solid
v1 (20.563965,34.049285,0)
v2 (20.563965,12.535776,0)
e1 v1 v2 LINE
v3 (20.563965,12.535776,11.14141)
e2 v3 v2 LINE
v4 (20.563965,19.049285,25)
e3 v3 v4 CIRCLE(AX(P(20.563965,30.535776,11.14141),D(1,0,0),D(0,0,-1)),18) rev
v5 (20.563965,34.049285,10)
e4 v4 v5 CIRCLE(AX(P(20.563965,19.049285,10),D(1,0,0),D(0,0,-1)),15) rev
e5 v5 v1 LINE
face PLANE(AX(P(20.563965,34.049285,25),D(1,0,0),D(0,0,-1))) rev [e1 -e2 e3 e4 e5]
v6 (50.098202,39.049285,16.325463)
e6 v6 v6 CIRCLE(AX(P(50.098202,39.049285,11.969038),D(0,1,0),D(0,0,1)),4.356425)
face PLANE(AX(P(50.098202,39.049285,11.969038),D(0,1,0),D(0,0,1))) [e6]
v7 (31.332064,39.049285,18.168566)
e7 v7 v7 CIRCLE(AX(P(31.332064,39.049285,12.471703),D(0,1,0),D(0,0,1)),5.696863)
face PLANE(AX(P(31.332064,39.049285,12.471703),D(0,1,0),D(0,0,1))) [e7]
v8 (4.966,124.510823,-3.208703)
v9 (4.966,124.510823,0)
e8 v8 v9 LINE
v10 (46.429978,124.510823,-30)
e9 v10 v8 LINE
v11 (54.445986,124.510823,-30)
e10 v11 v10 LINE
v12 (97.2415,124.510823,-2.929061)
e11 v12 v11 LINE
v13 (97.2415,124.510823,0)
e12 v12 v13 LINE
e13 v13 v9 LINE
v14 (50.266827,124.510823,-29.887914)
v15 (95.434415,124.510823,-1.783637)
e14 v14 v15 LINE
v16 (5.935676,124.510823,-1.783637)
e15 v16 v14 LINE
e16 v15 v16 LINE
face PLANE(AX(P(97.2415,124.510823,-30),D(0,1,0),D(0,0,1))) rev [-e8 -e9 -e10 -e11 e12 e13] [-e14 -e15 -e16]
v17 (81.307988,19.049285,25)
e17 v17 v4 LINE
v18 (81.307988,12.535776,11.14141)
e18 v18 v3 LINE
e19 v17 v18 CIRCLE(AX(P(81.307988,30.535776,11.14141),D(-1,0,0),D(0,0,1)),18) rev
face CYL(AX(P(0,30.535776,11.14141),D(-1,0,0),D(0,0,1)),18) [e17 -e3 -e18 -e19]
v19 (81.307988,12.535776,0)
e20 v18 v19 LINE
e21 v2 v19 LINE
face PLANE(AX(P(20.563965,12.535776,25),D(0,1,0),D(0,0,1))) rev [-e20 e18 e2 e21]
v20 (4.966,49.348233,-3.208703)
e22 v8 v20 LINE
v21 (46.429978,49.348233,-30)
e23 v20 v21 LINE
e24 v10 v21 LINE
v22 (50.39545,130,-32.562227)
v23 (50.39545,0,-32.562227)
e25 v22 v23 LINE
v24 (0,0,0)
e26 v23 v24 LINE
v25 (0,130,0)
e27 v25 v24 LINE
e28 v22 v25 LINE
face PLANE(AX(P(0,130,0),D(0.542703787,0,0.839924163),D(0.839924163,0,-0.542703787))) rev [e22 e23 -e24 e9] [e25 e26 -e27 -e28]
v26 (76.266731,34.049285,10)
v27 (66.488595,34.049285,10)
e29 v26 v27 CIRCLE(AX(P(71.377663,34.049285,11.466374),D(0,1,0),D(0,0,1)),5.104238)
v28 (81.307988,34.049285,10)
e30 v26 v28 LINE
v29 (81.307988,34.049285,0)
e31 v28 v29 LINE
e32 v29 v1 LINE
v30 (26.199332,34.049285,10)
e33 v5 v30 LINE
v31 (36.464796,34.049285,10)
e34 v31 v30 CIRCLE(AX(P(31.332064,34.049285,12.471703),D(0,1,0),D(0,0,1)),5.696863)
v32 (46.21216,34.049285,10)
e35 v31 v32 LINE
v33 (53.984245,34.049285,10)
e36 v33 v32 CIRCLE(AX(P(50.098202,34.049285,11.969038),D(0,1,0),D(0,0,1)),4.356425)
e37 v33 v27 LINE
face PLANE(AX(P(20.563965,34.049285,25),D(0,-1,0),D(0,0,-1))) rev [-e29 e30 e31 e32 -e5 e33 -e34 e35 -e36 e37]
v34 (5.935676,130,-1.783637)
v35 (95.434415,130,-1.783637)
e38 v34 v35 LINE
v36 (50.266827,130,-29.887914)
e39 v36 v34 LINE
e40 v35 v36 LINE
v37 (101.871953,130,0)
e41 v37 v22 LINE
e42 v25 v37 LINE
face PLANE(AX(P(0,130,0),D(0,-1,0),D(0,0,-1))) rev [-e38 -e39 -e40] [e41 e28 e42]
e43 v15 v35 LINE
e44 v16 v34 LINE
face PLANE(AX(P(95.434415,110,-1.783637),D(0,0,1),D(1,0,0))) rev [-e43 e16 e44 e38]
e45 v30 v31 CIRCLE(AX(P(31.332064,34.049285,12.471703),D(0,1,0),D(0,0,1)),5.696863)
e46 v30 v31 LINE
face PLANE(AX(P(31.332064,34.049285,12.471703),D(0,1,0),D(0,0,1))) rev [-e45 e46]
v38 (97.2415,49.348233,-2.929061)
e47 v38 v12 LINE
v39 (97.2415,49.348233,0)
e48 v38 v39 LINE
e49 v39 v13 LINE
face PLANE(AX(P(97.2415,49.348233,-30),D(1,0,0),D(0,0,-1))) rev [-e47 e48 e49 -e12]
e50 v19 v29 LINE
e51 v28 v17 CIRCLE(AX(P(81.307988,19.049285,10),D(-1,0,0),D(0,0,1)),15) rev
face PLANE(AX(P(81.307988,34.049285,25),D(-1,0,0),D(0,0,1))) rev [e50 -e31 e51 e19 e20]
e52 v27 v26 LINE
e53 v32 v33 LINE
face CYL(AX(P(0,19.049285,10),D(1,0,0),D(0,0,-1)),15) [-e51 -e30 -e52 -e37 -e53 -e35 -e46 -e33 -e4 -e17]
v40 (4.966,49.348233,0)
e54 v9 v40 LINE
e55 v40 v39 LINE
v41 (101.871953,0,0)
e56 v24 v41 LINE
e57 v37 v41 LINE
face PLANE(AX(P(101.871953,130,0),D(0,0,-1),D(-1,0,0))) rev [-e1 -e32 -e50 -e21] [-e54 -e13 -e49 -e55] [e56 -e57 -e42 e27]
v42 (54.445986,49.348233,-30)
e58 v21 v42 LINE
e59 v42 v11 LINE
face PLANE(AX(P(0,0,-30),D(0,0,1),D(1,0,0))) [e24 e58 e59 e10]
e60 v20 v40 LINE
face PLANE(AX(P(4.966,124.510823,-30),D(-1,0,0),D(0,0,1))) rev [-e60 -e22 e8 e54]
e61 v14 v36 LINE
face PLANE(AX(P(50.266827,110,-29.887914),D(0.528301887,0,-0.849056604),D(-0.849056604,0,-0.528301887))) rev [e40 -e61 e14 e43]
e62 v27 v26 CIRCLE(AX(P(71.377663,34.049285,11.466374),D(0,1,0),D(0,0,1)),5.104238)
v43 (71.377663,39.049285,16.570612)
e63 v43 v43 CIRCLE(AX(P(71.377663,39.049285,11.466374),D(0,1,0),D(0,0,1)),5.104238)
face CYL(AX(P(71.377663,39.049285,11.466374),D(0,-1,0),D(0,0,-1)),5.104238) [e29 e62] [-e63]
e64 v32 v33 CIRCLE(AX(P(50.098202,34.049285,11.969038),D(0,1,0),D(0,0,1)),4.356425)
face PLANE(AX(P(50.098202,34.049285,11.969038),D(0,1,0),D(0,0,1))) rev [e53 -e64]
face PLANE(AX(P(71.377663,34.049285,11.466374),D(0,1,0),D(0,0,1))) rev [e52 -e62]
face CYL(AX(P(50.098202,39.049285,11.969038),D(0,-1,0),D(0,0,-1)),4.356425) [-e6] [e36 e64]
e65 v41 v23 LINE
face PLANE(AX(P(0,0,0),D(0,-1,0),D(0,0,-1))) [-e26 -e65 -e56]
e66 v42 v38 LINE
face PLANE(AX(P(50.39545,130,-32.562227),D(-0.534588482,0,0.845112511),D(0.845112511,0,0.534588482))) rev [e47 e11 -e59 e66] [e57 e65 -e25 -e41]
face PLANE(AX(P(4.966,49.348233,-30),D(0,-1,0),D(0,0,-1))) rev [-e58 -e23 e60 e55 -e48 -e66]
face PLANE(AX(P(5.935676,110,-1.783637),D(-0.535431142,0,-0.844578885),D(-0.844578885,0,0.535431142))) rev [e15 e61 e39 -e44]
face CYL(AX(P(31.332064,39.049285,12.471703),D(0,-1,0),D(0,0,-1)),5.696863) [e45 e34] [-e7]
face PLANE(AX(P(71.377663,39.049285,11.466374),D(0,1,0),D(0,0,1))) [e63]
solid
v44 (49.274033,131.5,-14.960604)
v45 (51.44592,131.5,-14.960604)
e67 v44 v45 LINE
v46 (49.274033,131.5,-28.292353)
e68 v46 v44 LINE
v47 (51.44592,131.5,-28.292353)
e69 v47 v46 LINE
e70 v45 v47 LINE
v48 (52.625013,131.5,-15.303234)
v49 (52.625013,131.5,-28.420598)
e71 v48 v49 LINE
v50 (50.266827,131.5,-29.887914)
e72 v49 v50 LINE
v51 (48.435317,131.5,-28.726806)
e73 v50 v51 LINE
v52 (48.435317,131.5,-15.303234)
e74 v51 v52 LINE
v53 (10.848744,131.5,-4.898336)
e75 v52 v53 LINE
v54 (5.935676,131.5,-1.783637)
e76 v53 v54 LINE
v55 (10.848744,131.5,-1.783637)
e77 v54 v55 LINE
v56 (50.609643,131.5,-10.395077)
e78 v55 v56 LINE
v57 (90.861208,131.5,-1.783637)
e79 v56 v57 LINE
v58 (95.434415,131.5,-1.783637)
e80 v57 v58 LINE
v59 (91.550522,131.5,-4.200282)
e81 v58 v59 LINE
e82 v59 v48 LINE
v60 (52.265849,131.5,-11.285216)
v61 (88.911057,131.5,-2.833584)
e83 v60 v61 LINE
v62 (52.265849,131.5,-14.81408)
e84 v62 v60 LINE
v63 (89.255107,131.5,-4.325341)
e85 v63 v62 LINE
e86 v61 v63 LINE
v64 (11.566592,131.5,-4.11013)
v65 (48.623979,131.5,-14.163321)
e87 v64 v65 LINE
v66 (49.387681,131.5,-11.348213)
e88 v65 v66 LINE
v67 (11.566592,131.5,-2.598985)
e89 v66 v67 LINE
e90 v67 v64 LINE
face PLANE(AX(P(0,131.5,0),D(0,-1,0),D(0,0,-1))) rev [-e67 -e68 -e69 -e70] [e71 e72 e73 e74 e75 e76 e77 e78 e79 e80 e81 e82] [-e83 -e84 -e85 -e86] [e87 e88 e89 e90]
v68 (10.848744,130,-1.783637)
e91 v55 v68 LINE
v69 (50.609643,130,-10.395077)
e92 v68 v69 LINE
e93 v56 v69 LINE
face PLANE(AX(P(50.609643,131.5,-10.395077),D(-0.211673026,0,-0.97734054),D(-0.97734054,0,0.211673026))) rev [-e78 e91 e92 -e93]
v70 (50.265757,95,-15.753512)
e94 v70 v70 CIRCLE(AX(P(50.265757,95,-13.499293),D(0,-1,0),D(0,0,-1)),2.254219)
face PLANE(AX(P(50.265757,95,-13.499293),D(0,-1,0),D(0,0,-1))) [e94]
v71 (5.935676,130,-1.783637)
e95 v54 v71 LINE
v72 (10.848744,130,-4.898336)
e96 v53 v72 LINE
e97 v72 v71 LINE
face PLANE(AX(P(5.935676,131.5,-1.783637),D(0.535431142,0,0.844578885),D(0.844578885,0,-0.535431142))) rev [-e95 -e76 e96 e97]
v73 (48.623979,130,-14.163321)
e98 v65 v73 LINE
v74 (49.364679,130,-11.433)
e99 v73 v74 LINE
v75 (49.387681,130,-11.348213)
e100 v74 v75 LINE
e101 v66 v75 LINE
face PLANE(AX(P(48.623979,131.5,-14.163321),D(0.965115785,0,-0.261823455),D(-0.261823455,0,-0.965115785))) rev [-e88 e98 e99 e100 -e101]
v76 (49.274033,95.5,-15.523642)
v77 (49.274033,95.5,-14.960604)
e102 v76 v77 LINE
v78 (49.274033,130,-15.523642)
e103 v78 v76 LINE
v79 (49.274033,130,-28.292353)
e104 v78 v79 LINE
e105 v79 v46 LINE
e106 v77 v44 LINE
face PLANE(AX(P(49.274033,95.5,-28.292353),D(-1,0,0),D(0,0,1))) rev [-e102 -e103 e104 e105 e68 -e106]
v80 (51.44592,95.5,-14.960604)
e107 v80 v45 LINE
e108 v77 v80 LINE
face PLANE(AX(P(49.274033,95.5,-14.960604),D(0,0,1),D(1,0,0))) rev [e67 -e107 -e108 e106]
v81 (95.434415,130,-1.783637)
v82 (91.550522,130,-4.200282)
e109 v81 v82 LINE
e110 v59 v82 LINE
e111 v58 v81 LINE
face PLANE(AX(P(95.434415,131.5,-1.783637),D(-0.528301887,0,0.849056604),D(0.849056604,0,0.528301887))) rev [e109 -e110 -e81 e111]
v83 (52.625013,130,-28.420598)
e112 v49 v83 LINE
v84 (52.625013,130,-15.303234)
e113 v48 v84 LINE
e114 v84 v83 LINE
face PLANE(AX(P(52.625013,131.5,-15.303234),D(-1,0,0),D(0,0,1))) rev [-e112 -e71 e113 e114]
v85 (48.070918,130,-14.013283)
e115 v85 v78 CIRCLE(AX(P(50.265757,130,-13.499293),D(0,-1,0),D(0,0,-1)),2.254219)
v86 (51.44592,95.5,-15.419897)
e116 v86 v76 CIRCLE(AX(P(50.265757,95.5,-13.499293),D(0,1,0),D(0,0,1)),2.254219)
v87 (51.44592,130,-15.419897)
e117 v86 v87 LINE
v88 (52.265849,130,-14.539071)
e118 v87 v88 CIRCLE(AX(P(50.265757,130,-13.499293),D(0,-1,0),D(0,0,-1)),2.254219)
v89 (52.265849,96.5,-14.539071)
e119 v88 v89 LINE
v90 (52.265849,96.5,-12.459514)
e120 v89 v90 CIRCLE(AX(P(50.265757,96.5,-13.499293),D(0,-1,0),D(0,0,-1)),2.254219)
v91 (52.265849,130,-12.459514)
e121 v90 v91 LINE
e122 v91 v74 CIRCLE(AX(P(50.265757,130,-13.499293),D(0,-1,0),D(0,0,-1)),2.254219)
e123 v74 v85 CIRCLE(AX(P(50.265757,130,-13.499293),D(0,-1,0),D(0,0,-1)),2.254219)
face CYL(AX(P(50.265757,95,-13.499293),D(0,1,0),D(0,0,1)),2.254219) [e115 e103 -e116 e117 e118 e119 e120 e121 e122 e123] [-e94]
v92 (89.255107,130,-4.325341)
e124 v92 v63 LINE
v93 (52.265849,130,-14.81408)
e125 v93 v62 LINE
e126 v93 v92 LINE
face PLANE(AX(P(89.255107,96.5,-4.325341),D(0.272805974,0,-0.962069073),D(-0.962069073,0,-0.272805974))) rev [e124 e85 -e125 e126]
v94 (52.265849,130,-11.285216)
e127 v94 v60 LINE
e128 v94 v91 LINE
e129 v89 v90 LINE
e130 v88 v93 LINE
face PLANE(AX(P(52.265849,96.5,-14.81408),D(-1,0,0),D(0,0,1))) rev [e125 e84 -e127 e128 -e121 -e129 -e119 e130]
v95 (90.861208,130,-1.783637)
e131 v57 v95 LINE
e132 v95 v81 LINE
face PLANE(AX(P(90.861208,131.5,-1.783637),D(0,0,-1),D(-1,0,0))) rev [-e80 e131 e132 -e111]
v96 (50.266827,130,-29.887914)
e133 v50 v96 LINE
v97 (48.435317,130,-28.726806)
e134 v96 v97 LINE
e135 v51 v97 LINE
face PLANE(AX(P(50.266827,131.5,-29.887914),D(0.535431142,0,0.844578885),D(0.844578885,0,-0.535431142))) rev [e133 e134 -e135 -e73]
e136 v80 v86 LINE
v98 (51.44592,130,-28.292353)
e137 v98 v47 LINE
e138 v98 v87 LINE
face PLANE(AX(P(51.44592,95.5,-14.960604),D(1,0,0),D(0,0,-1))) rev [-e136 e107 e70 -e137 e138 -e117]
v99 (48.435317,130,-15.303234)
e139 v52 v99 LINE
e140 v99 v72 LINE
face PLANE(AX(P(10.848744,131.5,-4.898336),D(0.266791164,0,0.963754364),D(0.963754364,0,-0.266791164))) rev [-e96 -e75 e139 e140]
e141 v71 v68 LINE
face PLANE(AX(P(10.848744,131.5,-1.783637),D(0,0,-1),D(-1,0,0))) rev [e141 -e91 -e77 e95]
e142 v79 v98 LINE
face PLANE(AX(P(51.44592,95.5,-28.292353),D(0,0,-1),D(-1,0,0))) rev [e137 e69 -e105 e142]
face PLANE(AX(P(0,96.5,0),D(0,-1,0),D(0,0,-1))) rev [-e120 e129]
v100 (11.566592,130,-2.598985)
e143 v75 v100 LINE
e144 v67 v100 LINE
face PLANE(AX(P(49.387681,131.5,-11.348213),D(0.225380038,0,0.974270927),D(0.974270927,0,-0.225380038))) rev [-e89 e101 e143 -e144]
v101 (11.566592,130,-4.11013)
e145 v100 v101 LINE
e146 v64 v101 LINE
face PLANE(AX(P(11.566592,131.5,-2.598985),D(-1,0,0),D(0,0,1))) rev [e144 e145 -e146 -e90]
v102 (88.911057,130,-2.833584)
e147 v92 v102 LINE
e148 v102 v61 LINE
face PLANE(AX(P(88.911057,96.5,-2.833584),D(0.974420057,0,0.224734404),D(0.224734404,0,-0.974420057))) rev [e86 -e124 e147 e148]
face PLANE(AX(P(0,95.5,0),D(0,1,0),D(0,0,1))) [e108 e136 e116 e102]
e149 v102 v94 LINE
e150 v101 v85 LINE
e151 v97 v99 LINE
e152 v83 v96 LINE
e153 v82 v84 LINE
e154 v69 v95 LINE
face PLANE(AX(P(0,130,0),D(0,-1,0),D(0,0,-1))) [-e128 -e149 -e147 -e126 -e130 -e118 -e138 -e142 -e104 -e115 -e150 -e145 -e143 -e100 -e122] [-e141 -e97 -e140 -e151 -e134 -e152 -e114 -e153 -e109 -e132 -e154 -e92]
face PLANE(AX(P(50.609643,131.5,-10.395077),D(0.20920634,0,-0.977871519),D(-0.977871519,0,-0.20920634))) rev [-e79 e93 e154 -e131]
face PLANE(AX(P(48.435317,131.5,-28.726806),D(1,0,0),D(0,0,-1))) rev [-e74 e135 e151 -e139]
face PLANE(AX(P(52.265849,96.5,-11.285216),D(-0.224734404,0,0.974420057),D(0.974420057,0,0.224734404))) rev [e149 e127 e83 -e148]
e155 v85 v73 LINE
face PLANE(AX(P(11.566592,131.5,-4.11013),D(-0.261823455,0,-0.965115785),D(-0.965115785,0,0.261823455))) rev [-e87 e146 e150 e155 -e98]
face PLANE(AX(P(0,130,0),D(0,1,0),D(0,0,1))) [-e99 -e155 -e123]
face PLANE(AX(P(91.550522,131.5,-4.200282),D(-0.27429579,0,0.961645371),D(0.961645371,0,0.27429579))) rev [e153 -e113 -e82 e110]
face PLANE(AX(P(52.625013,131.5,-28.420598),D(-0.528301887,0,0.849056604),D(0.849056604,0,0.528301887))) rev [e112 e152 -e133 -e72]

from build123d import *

# Parameters (mm, degrees)
BOSS_EXTRUDE2_DEPTH  = 130
CUT_EXTRUDE2_DEPTH   = 20
SKETCH8_W            = 92.275500819
SKETCH8_H            = 75.162589758
CUT_EXTRUDE3_DEPTH   = 30
SKETCH10_W           = 60.744023663
SKETCH10_H           = 21.51350838
BOSS_EXTRUDE3_DEPTH  = 25
FILLET1_R            = 15
FILLET2_R            = 18
SKETCH13_R           = 5.696863497
BOSS_EXTRUDE4_DEPTH  = 5
SKETCH14_R           = 5.104237625
BOSS_EXTRUDE5_DEPTH  = 5
SKETCH15_R           = 4.356425027
BOSS_EXTRUDE6_DEPTH  = 5
BOSS_EXTRUDE7_DEPTH  = 1.5
BOSS_EXTRUDE8_DEPTH  = 1.5
BOSS_EXTRUDE9_DEPTH  = 1.5
SKETCH19_R           = 2.254219404
BOSS_EXTRUDE10_DEPTH = 35
CUT_EXTRUDE4_DEPTH   = 169.339518256
CUT_EXTRUDE7_DEPTH   = 35
SKETCH23_W           = 2.171886621
SKETCH23_H           = 13.331749198
CUT_EXTRUDE9_DEPTH   = 36


with BuildPart() as part:
    # Sketch1 → Boss-Extrude2 (new body)
    with BuildSketch(Plane(origin=(0, 0, 0), x_dir=(1, 0, 0), z_dir=(0, 1, 0))):
        Polygon((0, 0), (50.395449795, 32.562227195), (101.871952797, 0), align=None)
    extrude(amount=BOSS_EXTRUDE2_DEPTH)

    # Sketch9 → Cut-Extrude2 (cut)
    with BuildSketch(Plane(origin=(0, 130, 0), x_dir=(1, 0, 0), z_dir=(0, 1, 0))):
        Polygon((5.935675774, 1.783636913), (50.266826947, 29.887913883), (95.434414934, 1.783636913), align=None)
    extrude(amount=-CUT_EXTRUDE2_DEPTH, mode=Mode.SUBTRACT)

    # Sketch8 → Cut-Extrude3 (cut)
    with BuildSketch(Plane.XY):
        with Locations((51.103750037, 86.929527723)):
            Rectangle(SKETCH8_W, SKETCH8_H)
    extrude(amount=-CUT_EXTRUDE3_DEPTH, mode=Mode.SUBTRACT)

    # Sketch10 → Boss-Extrude3 (add)
    with BuildSketch(Plane.XY):
        with Locations((50.935976399, 23.292530585)):
            Rectangle(SKETCH10_W, SKETCH10_H)
    extrude(amount=BOSS_EXTRUDE3_DEPTH)

    # Fillet1
    fillet1_edges = [part.edges().sort_by_distance(p)[0] for p in [
        (50.935976399, 34.049284775, 25),
    ]]
    fillet(fillet1_edges, radius=FILLET1_R)

    # Fillet2
    # the kernel refuses this fillet: 18 mm, written as the material it takes off along each edge
    with BuildSketch(Plane(origin=(115.954462644, 12.535776395, 25), x_dir=(0, 1, 0), z_dir=(-1, 0, 0))) as fillet2_piece_1:
        with BuildLine():
            CenterArc((18, 13.858589765), FILLET2_R, 180, 50.346853939)
            Line((0, 13.858589765), (-0.36, 13.858589765))
            Line((-0.36, 13.858589765), (-0.36, 0))
            Line((-0.36, 0), (0, -0.36))
            ThreePointArc((0, -0.36), (3.25675419, -0.36), (6.283778548, -0.277171795))
            Line((6.283778548, -0.277171795), (6.513508381, 0))
        make_face()
    extrude(amount=130.03697249, mode=Mode.SUBTRACT)

    # Sketch13 → Boss-Extrude4 (add)
    with BuildSketch(Plane(origin=(0, 34.049284775, 0), x_dir=(1, 0, 0), z_dir=(0, 1, 0))):
        with Locations(Location((31.332063776, -12.47170285, 0), (0, 0, 154.286535708))):
            Circle(SKETCH13_R)
    extrude(amount=BOSS_EXTRUDE4_DEPTH)

    # Sketch14 → Boss-Extrude5 (add)
    with BuildSketch(Plane(origin=(0, 34.049284775, 0), x_dir=(1, 0, 0), z_dir=(0, 1, 0))):
        with Locations(Location((71.377663065, -11.466373998, 0), (0, 0, 163.30448122))):
            Circle(SKETCH14_R)
    extrude(amount=BOSS_EXTRUDE5_DEPTH)

    # Sketch15 → Boss-Extrude6 (add)
    with BuildSketch(Plane(origin=(0, 34.049284775, 0), x_dir=(1, 0, 0), z_dir=(0, 1, 0))):
        with Locations(Location((50.098202355, -11.969038424, 0), (0, 0, 153.128894057))):
            Circle(SKETCH15_R)
    extrude(amount=BOSS_EXTRUDE6_DEPTH)


with BuildPart() as body_2:
    # Sketch16 → Boss-Extrude7 (new body)
    with BuildSketch(Plane(origin=(0, 130, 0), x_dir=(1, 0, 0), z_dir=(0, 1, 0))):
        Polygon((10.848743574, 4.898336499), (50.56151381, 15.891818457), (50.609643394, 10.395077478), (10.848743574, 1.783636913), (5.935675774, 1.783636913), align=None)
    extrude(amount=BOSS_EXTRUDE7_DEPTH)

    # Sketch17 → Boss-Extrude8 (add)
    with BuildSketch(Plane(origin=(0, 130, 0), x_dir=(1, 0, 0), z_dir=(0, 1, 0))):
        Polygon((91.550521692, 4.200281597), (50.56151381, 15.891818457), (50.609643394, 10.395077478), (90.861207853, 1.783636913), (95.434414934, 1.783636913), align=None)
    extrude(amount=BOSS_EXTRUDE8_DEPTH)

    # Sketch18 → Boss-Extrude9 (add)
    with BuildSketch(Plane(origin=(0, 130, 0), x_dir=(1, 0, 0), z_dir=(0, 1, 0))):
        Polygon((48.435317206, 28.726805821), (48.435317206, 15.303234385), (50.56151381, 15.891818457), (52.625013027, 15.303234385), (52.625013027, 28.4205981), (50.266826947, 29.887913883), align=None)
    extrude(amount=BOSS_EXTRUDE9_DEPTH)

    # Sketch19 → Boss-Extrude10 (add)
    with BuildSketch(Plane.XZ.offset(-130)):
        with Locations(Location((50.265757164, -13.499292504, 0), (0, 0, 270))):
            Circle(SKETCH19_R)
    extrude(amount=BOSS_EXTRUDE10_DEPTH)

    # Sketch20 → Cut-Extrude4 (cut, through all)
    with BuildSketch(Plane(origin=(0, 130, 0), x_dir=(-1, 0, 0), z_dir=(0, -1, 0))):
        Polygon((-11.566591565, 4.110130279), (-48.623978622, 14.163321071), (-49.387681074, 11.348213118), (-11.566591565, 2.598984994), align=None)
    extrude(amount=-CUT_EXTRUDE4_DEPTH, mode=Mode.SUBTRACT)

    # Sketch21 → Cut-Extrude7 (cut)
    with BuildSketch(Plane(origin=(0, 131.5, 0), x_dir=(1, 0, 0), z_dir=(0, 1, 0))):
        Polygon((52.265848542, 14.814079801), (52.265848542, 11.285215779), (88.911057341, 2.833584376), (89.255107257, 4.325341463), align=None)
    extrude(amount=-CUT_EXTRUDE7_DEPTH, mode=Mode.SUBTRACT)

    # Sketch23 → Cut-Extrude9 (cut)
    with BuildSketch(Plane(origin=(0, 131.5, 0), x_dir=(1, 0, 0), z_dir=(0, 1, 0))):
        with Locations((50.359976677, 21.626478171)):
            Rectangle(SKETCH23_W, SKETCH23_H)
    extrude(amount=-CUT_EXTRUDE9_DEPTH, mode=Mode.SUBTRACT)


solid = Compound([part.part, body_2.part])
